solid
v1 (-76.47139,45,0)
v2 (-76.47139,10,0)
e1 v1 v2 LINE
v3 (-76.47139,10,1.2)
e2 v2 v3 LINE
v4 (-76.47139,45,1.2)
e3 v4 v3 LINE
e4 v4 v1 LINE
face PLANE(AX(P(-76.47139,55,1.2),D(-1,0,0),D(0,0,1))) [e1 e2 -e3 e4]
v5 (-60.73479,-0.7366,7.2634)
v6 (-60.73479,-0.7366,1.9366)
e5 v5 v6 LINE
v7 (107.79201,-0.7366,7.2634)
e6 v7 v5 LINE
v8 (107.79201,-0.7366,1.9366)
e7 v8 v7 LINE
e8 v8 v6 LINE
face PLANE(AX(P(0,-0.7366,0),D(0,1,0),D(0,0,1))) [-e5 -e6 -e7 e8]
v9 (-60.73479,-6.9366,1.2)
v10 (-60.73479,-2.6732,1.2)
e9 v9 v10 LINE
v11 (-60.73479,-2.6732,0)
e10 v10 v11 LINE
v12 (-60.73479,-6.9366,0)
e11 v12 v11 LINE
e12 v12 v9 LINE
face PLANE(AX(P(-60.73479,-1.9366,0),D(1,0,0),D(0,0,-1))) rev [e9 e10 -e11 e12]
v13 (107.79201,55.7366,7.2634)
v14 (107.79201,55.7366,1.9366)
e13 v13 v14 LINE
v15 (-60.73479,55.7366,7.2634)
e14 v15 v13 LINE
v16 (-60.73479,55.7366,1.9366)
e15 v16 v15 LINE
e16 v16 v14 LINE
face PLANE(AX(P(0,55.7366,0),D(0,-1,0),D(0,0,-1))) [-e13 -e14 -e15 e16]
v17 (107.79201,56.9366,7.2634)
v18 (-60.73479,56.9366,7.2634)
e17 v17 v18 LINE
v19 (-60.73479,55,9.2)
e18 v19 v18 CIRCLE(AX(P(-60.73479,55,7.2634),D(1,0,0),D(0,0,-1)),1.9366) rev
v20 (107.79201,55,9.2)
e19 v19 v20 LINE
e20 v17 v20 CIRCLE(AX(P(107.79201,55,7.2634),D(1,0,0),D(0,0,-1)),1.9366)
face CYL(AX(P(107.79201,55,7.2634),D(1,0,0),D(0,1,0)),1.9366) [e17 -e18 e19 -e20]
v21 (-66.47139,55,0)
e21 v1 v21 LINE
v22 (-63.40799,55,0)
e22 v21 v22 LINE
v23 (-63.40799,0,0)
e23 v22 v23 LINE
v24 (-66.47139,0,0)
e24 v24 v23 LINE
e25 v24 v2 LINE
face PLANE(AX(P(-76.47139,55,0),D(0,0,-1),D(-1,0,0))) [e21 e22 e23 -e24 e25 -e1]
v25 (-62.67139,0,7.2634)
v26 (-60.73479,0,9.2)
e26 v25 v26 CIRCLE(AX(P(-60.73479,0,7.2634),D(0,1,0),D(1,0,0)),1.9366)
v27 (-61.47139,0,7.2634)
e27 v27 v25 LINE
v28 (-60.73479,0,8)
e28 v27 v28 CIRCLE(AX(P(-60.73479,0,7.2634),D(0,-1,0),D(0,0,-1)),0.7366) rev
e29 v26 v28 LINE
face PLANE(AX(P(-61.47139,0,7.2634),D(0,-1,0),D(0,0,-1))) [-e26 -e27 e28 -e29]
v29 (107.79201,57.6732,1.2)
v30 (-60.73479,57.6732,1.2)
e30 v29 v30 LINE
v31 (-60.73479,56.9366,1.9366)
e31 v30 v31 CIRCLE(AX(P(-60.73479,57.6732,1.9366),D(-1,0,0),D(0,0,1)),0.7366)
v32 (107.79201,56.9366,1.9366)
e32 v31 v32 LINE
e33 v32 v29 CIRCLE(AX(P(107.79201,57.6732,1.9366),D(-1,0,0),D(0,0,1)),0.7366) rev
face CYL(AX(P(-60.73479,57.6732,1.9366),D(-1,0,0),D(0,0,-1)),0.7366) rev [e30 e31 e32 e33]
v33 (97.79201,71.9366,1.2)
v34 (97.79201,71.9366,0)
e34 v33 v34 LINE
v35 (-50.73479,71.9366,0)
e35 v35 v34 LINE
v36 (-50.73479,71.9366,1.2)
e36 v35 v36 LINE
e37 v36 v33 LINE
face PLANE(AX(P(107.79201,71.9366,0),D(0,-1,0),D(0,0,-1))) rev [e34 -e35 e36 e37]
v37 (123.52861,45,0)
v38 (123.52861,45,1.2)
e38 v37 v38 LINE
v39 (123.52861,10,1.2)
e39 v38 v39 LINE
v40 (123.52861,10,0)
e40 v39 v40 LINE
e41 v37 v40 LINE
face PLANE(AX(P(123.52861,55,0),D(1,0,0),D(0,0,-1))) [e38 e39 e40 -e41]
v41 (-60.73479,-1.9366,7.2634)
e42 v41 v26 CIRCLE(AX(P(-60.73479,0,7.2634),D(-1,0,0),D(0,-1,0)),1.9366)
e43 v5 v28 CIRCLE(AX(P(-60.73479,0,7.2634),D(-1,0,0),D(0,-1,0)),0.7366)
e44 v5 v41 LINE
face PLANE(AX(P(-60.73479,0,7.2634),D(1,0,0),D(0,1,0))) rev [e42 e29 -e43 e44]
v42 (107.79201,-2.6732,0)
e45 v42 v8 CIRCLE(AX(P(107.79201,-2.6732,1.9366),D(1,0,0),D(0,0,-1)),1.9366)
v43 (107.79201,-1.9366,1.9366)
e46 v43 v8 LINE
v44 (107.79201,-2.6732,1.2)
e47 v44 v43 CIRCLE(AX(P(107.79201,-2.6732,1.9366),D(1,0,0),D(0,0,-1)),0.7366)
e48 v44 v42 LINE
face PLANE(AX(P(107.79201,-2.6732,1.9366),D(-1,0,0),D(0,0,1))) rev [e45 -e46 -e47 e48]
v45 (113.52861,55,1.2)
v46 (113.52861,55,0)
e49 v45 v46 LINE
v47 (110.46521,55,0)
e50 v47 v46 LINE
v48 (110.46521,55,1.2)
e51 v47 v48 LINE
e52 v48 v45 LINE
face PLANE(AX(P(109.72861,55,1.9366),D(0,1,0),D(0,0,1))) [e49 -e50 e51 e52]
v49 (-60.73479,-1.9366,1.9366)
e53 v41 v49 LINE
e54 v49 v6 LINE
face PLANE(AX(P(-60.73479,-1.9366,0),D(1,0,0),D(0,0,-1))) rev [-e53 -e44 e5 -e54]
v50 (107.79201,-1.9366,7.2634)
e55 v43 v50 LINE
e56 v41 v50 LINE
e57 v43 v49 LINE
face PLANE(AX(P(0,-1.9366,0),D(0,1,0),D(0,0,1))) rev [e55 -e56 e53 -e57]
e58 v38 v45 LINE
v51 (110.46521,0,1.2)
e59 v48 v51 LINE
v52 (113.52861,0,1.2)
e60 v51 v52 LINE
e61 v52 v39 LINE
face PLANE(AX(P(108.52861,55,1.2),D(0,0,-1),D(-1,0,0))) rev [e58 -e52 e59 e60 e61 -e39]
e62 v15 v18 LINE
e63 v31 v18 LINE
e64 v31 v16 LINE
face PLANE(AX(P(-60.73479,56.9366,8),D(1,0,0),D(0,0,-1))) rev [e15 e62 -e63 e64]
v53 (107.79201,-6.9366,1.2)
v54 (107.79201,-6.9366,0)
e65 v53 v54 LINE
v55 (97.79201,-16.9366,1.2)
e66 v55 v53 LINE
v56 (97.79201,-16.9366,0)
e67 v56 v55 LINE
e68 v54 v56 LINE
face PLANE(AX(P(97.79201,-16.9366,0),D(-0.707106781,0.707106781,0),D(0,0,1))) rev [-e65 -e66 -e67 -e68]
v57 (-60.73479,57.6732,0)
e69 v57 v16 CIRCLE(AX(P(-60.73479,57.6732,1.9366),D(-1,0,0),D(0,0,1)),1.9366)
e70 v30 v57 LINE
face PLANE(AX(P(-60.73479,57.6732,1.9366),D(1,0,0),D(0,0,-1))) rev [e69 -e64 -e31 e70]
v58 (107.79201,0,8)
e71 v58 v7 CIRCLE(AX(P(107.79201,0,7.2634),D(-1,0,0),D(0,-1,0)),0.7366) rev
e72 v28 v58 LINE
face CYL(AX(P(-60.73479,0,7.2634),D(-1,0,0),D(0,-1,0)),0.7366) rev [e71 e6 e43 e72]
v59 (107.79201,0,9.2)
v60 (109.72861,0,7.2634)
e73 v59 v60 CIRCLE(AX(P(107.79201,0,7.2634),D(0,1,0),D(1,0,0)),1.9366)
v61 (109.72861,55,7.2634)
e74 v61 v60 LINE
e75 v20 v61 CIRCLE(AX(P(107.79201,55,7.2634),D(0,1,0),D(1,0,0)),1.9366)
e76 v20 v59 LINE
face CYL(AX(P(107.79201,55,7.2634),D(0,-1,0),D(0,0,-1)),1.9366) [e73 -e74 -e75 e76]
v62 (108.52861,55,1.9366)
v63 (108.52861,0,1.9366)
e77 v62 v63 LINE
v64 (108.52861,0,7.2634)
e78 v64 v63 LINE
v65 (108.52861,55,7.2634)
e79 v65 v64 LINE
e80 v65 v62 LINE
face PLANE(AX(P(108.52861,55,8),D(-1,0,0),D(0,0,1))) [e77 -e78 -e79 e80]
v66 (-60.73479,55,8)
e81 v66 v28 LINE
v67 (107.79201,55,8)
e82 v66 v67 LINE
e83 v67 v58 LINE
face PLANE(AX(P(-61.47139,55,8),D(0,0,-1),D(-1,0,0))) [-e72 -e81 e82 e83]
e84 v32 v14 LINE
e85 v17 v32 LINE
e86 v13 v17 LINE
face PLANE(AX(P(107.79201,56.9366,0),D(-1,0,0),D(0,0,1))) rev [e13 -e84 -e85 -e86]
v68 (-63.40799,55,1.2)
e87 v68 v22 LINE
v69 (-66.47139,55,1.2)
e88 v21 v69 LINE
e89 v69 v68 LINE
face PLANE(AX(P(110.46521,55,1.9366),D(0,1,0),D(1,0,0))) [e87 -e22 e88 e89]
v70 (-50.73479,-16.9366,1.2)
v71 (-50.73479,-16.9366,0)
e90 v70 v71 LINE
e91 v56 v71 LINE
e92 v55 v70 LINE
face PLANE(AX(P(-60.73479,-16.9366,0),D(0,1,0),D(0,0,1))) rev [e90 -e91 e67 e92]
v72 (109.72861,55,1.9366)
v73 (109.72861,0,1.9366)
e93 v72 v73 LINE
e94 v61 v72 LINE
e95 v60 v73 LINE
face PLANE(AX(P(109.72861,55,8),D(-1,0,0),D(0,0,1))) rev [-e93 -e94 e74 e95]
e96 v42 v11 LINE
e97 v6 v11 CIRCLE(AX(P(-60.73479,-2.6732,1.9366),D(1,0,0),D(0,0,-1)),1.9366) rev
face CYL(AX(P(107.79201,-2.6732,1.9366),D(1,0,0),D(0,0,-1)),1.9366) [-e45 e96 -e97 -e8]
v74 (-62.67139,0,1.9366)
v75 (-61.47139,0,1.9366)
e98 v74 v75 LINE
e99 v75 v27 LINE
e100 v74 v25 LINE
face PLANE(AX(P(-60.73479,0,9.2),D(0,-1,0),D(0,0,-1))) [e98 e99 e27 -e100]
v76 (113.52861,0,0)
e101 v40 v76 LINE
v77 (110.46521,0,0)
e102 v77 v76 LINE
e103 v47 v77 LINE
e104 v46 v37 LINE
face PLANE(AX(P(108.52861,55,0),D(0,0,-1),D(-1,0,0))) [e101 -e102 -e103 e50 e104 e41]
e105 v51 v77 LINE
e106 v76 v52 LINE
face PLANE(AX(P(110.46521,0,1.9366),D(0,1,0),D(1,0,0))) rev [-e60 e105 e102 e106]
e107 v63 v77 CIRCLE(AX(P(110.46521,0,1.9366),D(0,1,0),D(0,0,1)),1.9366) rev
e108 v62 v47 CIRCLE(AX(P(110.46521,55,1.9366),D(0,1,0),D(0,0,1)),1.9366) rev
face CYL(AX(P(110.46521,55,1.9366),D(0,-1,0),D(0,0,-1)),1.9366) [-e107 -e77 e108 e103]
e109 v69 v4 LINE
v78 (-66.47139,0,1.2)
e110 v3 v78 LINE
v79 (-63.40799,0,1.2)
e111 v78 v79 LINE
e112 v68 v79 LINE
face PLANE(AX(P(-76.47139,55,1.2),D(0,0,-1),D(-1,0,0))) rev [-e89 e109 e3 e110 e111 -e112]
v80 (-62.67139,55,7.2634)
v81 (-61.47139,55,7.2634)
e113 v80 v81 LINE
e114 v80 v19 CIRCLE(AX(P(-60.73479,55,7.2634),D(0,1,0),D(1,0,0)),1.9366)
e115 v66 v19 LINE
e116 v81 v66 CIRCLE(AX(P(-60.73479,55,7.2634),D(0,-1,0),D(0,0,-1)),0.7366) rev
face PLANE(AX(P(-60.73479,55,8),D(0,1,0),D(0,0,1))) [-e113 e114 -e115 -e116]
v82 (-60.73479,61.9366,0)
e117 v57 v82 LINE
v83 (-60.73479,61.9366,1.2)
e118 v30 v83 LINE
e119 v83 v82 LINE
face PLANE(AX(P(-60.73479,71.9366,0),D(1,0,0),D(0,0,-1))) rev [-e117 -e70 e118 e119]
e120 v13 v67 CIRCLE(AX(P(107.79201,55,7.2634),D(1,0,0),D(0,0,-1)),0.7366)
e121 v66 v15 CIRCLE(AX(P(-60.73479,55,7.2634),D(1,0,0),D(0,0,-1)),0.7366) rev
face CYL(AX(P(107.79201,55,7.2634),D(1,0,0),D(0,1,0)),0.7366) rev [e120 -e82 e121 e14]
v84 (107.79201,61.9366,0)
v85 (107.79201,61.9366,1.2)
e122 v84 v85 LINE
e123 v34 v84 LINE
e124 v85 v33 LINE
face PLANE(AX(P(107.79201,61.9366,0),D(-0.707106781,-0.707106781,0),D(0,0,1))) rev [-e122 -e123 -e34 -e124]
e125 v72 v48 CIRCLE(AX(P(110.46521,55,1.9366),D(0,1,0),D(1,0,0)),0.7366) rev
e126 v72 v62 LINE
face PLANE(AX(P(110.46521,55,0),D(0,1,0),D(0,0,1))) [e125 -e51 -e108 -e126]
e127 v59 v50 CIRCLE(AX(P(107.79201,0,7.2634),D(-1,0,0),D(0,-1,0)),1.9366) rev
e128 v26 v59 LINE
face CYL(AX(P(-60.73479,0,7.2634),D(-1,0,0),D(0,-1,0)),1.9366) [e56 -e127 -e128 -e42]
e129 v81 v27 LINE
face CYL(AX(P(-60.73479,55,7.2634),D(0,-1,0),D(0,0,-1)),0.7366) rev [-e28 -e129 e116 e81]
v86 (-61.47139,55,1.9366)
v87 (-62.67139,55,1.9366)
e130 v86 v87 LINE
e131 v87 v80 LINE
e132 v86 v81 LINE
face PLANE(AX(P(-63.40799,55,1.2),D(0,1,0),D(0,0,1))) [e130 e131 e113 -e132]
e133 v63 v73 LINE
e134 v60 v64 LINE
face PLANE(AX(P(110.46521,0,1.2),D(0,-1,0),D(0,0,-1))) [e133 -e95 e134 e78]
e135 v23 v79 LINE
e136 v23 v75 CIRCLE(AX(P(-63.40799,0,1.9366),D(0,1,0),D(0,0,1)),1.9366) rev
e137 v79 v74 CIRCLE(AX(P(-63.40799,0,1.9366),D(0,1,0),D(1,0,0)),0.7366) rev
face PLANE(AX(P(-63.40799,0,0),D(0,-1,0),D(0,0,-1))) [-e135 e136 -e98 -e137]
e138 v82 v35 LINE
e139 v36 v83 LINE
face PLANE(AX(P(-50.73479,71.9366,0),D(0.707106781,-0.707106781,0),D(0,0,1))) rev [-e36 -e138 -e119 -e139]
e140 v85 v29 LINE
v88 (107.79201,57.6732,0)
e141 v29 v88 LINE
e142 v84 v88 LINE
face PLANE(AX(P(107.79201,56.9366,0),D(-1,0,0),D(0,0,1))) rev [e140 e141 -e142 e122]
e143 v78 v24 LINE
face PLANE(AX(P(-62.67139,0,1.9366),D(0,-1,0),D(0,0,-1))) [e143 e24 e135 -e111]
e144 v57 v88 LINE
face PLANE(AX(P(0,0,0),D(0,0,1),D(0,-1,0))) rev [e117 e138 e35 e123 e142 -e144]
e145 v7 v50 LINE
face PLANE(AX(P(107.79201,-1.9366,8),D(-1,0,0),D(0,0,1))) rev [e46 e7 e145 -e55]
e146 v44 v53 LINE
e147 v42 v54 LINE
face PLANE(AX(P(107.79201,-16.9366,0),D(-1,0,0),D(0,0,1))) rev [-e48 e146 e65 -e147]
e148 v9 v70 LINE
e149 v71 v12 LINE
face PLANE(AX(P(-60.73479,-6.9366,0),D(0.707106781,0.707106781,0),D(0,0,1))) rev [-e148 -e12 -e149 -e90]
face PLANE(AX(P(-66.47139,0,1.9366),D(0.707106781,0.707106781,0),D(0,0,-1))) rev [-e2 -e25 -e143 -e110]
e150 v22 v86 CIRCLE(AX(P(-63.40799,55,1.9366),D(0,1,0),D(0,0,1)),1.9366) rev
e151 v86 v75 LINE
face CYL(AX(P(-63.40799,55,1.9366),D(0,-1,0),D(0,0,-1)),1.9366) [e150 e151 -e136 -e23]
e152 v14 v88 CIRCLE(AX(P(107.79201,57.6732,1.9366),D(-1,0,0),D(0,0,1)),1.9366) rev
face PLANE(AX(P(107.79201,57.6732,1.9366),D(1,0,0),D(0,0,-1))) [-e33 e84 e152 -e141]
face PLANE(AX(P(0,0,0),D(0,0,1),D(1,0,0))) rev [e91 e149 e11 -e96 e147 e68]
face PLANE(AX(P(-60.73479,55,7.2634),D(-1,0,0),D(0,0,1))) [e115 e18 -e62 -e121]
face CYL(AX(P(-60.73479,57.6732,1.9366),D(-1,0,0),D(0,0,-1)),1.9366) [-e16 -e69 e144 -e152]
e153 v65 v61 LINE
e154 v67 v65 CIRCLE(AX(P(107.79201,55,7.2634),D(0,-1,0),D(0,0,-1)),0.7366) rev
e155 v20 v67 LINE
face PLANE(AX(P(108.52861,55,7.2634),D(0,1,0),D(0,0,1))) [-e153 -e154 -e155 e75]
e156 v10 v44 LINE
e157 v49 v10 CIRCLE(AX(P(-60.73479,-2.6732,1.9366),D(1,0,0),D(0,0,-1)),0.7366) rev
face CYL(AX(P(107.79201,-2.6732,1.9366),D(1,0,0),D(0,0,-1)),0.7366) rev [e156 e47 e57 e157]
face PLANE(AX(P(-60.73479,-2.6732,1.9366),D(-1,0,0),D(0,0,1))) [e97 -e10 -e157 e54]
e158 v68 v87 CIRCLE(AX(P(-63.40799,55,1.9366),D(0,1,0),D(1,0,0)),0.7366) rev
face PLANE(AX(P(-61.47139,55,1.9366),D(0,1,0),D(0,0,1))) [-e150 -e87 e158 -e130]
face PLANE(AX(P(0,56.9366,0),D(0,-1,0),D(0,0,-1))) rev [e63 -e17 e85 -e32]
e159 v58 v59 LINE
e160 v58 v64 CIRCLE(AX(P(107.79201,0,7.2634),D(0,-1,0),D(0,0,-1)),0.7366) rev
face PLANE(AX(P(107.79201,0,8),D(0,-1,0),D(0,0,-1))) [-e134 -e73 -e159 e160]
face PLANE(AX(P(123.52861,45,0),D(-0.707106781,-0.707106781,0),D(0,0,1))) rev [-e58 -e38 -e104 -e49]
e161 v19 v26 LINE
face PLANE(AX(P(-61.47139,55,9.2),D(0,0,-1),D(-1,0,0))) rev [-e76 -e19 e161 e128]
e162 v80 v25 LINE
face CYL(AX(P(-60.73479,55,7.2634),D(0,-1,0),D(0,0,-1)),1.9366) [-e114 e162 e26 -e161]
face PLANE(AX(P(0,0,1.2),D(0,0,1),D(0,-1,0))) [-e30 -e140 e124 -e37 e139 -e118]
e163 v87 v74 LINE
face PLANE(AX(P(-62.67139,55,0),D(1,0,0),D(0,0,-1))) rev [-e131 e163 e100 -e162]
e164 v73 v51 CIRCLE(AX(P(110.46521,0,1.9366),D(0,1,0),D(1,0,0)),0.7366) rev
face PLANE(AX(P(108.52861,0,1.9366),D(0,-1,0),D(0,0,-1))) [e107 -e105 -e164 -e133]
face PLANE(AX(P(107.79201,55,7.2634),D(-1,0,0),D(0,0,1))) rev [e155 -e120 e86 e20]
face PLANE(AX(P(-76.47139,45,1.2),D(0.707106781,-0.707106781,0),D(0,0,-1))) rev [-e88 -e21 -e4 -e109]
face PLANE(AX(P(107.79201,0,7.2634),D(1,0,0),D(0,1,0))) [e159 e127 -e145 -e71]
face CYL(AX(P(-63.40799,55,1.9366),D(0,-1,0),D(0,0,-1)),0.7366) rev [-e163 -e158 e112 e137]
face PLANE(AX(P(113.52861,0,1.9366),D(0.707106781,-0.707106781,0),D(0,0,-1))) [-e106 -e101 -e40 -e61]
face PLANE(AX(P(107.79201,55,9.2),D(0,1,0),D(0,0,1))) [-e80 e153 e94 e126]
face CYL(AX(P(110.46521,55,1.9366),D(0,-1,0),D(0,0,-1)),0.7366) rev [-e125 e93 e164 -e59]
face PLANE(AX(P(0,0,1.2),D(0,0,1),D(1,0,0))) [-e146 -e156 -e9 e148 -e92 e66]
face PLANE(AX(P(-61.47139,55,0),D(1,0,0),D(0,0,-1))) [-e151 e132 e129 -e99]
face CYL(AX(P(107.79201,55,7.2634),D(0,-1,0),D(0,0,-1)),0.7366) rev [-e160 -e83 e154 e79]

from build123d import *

# Parameters (mm, degrees)
BASE_FLANGE1_DEPTH           = 55
EDGE_FLANGE1_DEPTH           = 168.5268
EDGE_FLANGE2_STRIP_W         = 6.2732
EDGE_FLANGE2_STRIP_H         = 1.2
EDGE_FLANGE2_STRIP_CUT_DEPTH = 168.5268
EDGE_FLANGE2_DEPTH           = 168.5268
EDGE_FLANGE3_DEPTH           = 168.5268
EDGE_FLANGE4_STRIP_W         = 6.2732
EDGE_FLANGE4_STRIP_H         = 1.2
EDGE_FLANGE4_STRIP_CUT_DEPTH = 168.5268
EDGE_FLANGE4_DEPTH           = 168.5268
CHAMFER1_SIZE                = 10


# Sheet-metal steps are written as plain solids
with BuildPart() as part:
    # Sketch1 → Base-Flange1 (new body)
    with BuildSketch(Plane(origin=(0, 0, 0), x_dir=(1, 0, 0), z_dir=(0, 1, 0))):
        with BuildLine():
            Line((-76.471389646, 0), (-63.407989646, 0))
            ThreePointArc((-63.407989646, 0), (-62.038606653, -0.567217008), (-61.471389646, -1.9366))
            Line((-61.471389646, -1.9366), (-61.471389646, -7.2634))
            ThreePointArc((-61.471389646, -7.2634), (-61.255644501, -7.784254855), (-60.734789646, -8))
            Line((-60.734789646, -8), (107.792010354, -8))
            ThreePointArc((107.792010354, -8), (108.312865209, -7.784254855), (108.528610354, -7.2634))
            Line((108.528610354, -7.2634), (108.528610354, -1.9366))
            ThreePointArc((108.528610354, -1.9366), (109.095827362, -0.567217008), (110.465210354, 0))
            Line((110.465210354, 0), (123.528610354, 0))
            Line((123.528610354, 0), (123.528610354, -1.2))
            Line((123.528610354, -1.2), (110.465210354, -1.2))
            ThreePointArc((110.465210354, -1.2), (109.944355499, -1.415745145), (109.728610354, -1.9366))
            Line((109.728610354, -1.9366), (109.728610354, -7.2634))
            ThreePointArc((109.728610354, -7.2634), (109.161393347, -8.632782992), (107.792010354, -9.2))
            Line((107.792010354, -9.2), (-60.734789646, -9.2))
            ThreePointArc((-60.734789646, -9.2), (-62.104172638, -8.632782992), (-62.671389646, -7.2634))
            Line((-62.671389646, -7.2634), (-62.671389646, -1.9366))
            ThreePointArc((-62.671389646, -1.9366), (-62.887134791, -1.415745145), (-63.407989646, -1.2))
            Line((-63.407989646, -1.2), (-76.471389646, -1.2))
            Line((-76.471389646, -1.2), (-76.471389646, 0))
        make_face()
    extrude(amount=BASE_FLANGE1_DEPTH)

    # Edge-Flange1 section (across the edge) → Edge-Flange1 (add)
    with BuildSketch(Plane(origin=(-60.734789646, 55.7366, 8), x_dir=(0, -1, 0), z_dir=(1, 0, 0))):
        with BuildLine():
            Line((-1.2, 0.7366), (-1.2, 8))
            Line((-1.2, 8), (0, 8))
            Line((0, 8), (0, 0.7366))
            ThreePointArc((0, 0.7366), (0.215745145, 0.215745145), (0.7366, 0))
            Line((0.7366, 0), (0.7366, -1.2))
            ThreePointArc((0.7366, -1.2), (-0.632782992, -0.632782992), (-1.2, 0.7366))
        make_face()
    extrude(amount=EDGE_FLANGE1_DEPTH)

    # Edge-Flange2 strip (across the edge) → Edge-Flange2 strip cut (cut)
    with BuildSketch(Plane(origin=(107.792010354, 56.9366, 0), x_dir=(0, 0, 1), z_dir=(-1, 0, 0))):
        with Locations((-1.2, -0.6)):
            Rectangle(EDGE_FLANGE2_STRIP_W, EDGE_FLANGE2_STRIP_H)
    extrude(amount=EDGE_FLANGE2_STRIP_CUT_DEPTH, mode=Mode.SUBTRACT)

    # Edge-Flange2 section (across the edge) → Edge-Flange2 (add)
    with BuildSketch(Plane(origin=(107.792010354, 56.9366, 0), x_dir=(0, 0, 1), z_dir=(-1, 0, 0))):
        with BuildLine():
            Line((0, 0.7366), (0, 15))
            Line((0, 15), (1.2, 15))
            Line((1.2, 15), (1.2, 0.7366))
            ThreePointArc((1.2, 0.7366), (1.415745145, 0.215745145), (1.9366, 0))
            Line((1.9366, 0), (1.9366, -1.2))
            ThreePointArc((1.9366, -1.2), (0.567217008, -0.632782992), (0, 0.7366))
        make_face()
    extrude(amount=EDGE_FLANGE2_DEPTH)

    # Edge-Flange3 section (across the edge) → Edge-Flange3 (add)
    with BuildSketch(Plane(origin=(107.792010354, -0.7366, 8), x_dir=(0, 1, 0), z_dir=(-1, 0, 0))):
        with BuildLine():
            Line((-1.2, 0.7366), (-1.2, 8))
            Line((-1.2, 8), (0, 8))
            Line((0, 8), (0, 0.7366))
            ThreePointArc((0, 0.7366), (0.215745145, 0.215745145), (0.7366, 0))
            Line((0.7366, 0), (0.7366, -1.2))
            ThreePointArc((0.7366, -1.2), (-0.632782992, -0.632782992), (-1.2, 0.7366))
        make_face()
    extrude(amount=EDGE_FLANGE3_DEPTH)

    # Edge-Flange4 strip (across the edge) → Edge-Flange4 strip cut (cut)
    with BuildSketch(Plane(origin=(-60.734789646, -1.9366, 0), x_dir=(0, 0, 1), z_dir=(1, 0, 0))):
        with Locations((-1.2, -0.6)):
            Rectangle(EDGE_FLANGE4_STRIP_W, EDGE_FLANGE4_STRIP_H)
    extrude(amount=EDGE_FLANGE4_STRIP_CUT_DEPTH, mode=Mode.SUBTRACT)

    # Edge-Flange4 section (across the edge) → Edge-Flange4 (add)
    with BuildSketch(Plane(origin=(-60.734789646, -1.9366, 0), x_dir=(0, 0, 1), z_dir=(1, 0, 0))):
        with BuildLine():
            Line((0, 0.7366), (0, 15))
            Line((0, 15), (1.2, 15))
            Line((1.2, 15), (1.2, 0.7366))
            ThreePointArc((1.2, 0.7366), (1.415745145, 0.215745145), (1.9366, 0))
            Line((1.9366, 0), (1.9366, -1.2))
            ThreePointArc((1.9366, -1.2), (0.567217008, -0.632782992), (0, 0.7366))
        make_face()
    extrude(amount=EDGE_FLANGE4_DEPTH)

    # Chamfer1
    chamfer1_edges = [part.edges().sort_by_distance(p)[0] for p in [
        (107.792010354, 71.9366, 0.6),
        (-60.734789646, 71.9366, 0.6),
        (-60.734789646, -16.9366, 0.6),
        (107.792010354, -16.9366, 0.6),
        (-76.471389646, 0, 0.6),
        (123.528610354, 0, 0.6),
        (-76.471389646, 55, 0.6),
        (123.528610354, 55, 0.6),
    ]]
    chamfer(chamfer1_edges, length=CHAMFER1_SIZE)


solid = part.part
